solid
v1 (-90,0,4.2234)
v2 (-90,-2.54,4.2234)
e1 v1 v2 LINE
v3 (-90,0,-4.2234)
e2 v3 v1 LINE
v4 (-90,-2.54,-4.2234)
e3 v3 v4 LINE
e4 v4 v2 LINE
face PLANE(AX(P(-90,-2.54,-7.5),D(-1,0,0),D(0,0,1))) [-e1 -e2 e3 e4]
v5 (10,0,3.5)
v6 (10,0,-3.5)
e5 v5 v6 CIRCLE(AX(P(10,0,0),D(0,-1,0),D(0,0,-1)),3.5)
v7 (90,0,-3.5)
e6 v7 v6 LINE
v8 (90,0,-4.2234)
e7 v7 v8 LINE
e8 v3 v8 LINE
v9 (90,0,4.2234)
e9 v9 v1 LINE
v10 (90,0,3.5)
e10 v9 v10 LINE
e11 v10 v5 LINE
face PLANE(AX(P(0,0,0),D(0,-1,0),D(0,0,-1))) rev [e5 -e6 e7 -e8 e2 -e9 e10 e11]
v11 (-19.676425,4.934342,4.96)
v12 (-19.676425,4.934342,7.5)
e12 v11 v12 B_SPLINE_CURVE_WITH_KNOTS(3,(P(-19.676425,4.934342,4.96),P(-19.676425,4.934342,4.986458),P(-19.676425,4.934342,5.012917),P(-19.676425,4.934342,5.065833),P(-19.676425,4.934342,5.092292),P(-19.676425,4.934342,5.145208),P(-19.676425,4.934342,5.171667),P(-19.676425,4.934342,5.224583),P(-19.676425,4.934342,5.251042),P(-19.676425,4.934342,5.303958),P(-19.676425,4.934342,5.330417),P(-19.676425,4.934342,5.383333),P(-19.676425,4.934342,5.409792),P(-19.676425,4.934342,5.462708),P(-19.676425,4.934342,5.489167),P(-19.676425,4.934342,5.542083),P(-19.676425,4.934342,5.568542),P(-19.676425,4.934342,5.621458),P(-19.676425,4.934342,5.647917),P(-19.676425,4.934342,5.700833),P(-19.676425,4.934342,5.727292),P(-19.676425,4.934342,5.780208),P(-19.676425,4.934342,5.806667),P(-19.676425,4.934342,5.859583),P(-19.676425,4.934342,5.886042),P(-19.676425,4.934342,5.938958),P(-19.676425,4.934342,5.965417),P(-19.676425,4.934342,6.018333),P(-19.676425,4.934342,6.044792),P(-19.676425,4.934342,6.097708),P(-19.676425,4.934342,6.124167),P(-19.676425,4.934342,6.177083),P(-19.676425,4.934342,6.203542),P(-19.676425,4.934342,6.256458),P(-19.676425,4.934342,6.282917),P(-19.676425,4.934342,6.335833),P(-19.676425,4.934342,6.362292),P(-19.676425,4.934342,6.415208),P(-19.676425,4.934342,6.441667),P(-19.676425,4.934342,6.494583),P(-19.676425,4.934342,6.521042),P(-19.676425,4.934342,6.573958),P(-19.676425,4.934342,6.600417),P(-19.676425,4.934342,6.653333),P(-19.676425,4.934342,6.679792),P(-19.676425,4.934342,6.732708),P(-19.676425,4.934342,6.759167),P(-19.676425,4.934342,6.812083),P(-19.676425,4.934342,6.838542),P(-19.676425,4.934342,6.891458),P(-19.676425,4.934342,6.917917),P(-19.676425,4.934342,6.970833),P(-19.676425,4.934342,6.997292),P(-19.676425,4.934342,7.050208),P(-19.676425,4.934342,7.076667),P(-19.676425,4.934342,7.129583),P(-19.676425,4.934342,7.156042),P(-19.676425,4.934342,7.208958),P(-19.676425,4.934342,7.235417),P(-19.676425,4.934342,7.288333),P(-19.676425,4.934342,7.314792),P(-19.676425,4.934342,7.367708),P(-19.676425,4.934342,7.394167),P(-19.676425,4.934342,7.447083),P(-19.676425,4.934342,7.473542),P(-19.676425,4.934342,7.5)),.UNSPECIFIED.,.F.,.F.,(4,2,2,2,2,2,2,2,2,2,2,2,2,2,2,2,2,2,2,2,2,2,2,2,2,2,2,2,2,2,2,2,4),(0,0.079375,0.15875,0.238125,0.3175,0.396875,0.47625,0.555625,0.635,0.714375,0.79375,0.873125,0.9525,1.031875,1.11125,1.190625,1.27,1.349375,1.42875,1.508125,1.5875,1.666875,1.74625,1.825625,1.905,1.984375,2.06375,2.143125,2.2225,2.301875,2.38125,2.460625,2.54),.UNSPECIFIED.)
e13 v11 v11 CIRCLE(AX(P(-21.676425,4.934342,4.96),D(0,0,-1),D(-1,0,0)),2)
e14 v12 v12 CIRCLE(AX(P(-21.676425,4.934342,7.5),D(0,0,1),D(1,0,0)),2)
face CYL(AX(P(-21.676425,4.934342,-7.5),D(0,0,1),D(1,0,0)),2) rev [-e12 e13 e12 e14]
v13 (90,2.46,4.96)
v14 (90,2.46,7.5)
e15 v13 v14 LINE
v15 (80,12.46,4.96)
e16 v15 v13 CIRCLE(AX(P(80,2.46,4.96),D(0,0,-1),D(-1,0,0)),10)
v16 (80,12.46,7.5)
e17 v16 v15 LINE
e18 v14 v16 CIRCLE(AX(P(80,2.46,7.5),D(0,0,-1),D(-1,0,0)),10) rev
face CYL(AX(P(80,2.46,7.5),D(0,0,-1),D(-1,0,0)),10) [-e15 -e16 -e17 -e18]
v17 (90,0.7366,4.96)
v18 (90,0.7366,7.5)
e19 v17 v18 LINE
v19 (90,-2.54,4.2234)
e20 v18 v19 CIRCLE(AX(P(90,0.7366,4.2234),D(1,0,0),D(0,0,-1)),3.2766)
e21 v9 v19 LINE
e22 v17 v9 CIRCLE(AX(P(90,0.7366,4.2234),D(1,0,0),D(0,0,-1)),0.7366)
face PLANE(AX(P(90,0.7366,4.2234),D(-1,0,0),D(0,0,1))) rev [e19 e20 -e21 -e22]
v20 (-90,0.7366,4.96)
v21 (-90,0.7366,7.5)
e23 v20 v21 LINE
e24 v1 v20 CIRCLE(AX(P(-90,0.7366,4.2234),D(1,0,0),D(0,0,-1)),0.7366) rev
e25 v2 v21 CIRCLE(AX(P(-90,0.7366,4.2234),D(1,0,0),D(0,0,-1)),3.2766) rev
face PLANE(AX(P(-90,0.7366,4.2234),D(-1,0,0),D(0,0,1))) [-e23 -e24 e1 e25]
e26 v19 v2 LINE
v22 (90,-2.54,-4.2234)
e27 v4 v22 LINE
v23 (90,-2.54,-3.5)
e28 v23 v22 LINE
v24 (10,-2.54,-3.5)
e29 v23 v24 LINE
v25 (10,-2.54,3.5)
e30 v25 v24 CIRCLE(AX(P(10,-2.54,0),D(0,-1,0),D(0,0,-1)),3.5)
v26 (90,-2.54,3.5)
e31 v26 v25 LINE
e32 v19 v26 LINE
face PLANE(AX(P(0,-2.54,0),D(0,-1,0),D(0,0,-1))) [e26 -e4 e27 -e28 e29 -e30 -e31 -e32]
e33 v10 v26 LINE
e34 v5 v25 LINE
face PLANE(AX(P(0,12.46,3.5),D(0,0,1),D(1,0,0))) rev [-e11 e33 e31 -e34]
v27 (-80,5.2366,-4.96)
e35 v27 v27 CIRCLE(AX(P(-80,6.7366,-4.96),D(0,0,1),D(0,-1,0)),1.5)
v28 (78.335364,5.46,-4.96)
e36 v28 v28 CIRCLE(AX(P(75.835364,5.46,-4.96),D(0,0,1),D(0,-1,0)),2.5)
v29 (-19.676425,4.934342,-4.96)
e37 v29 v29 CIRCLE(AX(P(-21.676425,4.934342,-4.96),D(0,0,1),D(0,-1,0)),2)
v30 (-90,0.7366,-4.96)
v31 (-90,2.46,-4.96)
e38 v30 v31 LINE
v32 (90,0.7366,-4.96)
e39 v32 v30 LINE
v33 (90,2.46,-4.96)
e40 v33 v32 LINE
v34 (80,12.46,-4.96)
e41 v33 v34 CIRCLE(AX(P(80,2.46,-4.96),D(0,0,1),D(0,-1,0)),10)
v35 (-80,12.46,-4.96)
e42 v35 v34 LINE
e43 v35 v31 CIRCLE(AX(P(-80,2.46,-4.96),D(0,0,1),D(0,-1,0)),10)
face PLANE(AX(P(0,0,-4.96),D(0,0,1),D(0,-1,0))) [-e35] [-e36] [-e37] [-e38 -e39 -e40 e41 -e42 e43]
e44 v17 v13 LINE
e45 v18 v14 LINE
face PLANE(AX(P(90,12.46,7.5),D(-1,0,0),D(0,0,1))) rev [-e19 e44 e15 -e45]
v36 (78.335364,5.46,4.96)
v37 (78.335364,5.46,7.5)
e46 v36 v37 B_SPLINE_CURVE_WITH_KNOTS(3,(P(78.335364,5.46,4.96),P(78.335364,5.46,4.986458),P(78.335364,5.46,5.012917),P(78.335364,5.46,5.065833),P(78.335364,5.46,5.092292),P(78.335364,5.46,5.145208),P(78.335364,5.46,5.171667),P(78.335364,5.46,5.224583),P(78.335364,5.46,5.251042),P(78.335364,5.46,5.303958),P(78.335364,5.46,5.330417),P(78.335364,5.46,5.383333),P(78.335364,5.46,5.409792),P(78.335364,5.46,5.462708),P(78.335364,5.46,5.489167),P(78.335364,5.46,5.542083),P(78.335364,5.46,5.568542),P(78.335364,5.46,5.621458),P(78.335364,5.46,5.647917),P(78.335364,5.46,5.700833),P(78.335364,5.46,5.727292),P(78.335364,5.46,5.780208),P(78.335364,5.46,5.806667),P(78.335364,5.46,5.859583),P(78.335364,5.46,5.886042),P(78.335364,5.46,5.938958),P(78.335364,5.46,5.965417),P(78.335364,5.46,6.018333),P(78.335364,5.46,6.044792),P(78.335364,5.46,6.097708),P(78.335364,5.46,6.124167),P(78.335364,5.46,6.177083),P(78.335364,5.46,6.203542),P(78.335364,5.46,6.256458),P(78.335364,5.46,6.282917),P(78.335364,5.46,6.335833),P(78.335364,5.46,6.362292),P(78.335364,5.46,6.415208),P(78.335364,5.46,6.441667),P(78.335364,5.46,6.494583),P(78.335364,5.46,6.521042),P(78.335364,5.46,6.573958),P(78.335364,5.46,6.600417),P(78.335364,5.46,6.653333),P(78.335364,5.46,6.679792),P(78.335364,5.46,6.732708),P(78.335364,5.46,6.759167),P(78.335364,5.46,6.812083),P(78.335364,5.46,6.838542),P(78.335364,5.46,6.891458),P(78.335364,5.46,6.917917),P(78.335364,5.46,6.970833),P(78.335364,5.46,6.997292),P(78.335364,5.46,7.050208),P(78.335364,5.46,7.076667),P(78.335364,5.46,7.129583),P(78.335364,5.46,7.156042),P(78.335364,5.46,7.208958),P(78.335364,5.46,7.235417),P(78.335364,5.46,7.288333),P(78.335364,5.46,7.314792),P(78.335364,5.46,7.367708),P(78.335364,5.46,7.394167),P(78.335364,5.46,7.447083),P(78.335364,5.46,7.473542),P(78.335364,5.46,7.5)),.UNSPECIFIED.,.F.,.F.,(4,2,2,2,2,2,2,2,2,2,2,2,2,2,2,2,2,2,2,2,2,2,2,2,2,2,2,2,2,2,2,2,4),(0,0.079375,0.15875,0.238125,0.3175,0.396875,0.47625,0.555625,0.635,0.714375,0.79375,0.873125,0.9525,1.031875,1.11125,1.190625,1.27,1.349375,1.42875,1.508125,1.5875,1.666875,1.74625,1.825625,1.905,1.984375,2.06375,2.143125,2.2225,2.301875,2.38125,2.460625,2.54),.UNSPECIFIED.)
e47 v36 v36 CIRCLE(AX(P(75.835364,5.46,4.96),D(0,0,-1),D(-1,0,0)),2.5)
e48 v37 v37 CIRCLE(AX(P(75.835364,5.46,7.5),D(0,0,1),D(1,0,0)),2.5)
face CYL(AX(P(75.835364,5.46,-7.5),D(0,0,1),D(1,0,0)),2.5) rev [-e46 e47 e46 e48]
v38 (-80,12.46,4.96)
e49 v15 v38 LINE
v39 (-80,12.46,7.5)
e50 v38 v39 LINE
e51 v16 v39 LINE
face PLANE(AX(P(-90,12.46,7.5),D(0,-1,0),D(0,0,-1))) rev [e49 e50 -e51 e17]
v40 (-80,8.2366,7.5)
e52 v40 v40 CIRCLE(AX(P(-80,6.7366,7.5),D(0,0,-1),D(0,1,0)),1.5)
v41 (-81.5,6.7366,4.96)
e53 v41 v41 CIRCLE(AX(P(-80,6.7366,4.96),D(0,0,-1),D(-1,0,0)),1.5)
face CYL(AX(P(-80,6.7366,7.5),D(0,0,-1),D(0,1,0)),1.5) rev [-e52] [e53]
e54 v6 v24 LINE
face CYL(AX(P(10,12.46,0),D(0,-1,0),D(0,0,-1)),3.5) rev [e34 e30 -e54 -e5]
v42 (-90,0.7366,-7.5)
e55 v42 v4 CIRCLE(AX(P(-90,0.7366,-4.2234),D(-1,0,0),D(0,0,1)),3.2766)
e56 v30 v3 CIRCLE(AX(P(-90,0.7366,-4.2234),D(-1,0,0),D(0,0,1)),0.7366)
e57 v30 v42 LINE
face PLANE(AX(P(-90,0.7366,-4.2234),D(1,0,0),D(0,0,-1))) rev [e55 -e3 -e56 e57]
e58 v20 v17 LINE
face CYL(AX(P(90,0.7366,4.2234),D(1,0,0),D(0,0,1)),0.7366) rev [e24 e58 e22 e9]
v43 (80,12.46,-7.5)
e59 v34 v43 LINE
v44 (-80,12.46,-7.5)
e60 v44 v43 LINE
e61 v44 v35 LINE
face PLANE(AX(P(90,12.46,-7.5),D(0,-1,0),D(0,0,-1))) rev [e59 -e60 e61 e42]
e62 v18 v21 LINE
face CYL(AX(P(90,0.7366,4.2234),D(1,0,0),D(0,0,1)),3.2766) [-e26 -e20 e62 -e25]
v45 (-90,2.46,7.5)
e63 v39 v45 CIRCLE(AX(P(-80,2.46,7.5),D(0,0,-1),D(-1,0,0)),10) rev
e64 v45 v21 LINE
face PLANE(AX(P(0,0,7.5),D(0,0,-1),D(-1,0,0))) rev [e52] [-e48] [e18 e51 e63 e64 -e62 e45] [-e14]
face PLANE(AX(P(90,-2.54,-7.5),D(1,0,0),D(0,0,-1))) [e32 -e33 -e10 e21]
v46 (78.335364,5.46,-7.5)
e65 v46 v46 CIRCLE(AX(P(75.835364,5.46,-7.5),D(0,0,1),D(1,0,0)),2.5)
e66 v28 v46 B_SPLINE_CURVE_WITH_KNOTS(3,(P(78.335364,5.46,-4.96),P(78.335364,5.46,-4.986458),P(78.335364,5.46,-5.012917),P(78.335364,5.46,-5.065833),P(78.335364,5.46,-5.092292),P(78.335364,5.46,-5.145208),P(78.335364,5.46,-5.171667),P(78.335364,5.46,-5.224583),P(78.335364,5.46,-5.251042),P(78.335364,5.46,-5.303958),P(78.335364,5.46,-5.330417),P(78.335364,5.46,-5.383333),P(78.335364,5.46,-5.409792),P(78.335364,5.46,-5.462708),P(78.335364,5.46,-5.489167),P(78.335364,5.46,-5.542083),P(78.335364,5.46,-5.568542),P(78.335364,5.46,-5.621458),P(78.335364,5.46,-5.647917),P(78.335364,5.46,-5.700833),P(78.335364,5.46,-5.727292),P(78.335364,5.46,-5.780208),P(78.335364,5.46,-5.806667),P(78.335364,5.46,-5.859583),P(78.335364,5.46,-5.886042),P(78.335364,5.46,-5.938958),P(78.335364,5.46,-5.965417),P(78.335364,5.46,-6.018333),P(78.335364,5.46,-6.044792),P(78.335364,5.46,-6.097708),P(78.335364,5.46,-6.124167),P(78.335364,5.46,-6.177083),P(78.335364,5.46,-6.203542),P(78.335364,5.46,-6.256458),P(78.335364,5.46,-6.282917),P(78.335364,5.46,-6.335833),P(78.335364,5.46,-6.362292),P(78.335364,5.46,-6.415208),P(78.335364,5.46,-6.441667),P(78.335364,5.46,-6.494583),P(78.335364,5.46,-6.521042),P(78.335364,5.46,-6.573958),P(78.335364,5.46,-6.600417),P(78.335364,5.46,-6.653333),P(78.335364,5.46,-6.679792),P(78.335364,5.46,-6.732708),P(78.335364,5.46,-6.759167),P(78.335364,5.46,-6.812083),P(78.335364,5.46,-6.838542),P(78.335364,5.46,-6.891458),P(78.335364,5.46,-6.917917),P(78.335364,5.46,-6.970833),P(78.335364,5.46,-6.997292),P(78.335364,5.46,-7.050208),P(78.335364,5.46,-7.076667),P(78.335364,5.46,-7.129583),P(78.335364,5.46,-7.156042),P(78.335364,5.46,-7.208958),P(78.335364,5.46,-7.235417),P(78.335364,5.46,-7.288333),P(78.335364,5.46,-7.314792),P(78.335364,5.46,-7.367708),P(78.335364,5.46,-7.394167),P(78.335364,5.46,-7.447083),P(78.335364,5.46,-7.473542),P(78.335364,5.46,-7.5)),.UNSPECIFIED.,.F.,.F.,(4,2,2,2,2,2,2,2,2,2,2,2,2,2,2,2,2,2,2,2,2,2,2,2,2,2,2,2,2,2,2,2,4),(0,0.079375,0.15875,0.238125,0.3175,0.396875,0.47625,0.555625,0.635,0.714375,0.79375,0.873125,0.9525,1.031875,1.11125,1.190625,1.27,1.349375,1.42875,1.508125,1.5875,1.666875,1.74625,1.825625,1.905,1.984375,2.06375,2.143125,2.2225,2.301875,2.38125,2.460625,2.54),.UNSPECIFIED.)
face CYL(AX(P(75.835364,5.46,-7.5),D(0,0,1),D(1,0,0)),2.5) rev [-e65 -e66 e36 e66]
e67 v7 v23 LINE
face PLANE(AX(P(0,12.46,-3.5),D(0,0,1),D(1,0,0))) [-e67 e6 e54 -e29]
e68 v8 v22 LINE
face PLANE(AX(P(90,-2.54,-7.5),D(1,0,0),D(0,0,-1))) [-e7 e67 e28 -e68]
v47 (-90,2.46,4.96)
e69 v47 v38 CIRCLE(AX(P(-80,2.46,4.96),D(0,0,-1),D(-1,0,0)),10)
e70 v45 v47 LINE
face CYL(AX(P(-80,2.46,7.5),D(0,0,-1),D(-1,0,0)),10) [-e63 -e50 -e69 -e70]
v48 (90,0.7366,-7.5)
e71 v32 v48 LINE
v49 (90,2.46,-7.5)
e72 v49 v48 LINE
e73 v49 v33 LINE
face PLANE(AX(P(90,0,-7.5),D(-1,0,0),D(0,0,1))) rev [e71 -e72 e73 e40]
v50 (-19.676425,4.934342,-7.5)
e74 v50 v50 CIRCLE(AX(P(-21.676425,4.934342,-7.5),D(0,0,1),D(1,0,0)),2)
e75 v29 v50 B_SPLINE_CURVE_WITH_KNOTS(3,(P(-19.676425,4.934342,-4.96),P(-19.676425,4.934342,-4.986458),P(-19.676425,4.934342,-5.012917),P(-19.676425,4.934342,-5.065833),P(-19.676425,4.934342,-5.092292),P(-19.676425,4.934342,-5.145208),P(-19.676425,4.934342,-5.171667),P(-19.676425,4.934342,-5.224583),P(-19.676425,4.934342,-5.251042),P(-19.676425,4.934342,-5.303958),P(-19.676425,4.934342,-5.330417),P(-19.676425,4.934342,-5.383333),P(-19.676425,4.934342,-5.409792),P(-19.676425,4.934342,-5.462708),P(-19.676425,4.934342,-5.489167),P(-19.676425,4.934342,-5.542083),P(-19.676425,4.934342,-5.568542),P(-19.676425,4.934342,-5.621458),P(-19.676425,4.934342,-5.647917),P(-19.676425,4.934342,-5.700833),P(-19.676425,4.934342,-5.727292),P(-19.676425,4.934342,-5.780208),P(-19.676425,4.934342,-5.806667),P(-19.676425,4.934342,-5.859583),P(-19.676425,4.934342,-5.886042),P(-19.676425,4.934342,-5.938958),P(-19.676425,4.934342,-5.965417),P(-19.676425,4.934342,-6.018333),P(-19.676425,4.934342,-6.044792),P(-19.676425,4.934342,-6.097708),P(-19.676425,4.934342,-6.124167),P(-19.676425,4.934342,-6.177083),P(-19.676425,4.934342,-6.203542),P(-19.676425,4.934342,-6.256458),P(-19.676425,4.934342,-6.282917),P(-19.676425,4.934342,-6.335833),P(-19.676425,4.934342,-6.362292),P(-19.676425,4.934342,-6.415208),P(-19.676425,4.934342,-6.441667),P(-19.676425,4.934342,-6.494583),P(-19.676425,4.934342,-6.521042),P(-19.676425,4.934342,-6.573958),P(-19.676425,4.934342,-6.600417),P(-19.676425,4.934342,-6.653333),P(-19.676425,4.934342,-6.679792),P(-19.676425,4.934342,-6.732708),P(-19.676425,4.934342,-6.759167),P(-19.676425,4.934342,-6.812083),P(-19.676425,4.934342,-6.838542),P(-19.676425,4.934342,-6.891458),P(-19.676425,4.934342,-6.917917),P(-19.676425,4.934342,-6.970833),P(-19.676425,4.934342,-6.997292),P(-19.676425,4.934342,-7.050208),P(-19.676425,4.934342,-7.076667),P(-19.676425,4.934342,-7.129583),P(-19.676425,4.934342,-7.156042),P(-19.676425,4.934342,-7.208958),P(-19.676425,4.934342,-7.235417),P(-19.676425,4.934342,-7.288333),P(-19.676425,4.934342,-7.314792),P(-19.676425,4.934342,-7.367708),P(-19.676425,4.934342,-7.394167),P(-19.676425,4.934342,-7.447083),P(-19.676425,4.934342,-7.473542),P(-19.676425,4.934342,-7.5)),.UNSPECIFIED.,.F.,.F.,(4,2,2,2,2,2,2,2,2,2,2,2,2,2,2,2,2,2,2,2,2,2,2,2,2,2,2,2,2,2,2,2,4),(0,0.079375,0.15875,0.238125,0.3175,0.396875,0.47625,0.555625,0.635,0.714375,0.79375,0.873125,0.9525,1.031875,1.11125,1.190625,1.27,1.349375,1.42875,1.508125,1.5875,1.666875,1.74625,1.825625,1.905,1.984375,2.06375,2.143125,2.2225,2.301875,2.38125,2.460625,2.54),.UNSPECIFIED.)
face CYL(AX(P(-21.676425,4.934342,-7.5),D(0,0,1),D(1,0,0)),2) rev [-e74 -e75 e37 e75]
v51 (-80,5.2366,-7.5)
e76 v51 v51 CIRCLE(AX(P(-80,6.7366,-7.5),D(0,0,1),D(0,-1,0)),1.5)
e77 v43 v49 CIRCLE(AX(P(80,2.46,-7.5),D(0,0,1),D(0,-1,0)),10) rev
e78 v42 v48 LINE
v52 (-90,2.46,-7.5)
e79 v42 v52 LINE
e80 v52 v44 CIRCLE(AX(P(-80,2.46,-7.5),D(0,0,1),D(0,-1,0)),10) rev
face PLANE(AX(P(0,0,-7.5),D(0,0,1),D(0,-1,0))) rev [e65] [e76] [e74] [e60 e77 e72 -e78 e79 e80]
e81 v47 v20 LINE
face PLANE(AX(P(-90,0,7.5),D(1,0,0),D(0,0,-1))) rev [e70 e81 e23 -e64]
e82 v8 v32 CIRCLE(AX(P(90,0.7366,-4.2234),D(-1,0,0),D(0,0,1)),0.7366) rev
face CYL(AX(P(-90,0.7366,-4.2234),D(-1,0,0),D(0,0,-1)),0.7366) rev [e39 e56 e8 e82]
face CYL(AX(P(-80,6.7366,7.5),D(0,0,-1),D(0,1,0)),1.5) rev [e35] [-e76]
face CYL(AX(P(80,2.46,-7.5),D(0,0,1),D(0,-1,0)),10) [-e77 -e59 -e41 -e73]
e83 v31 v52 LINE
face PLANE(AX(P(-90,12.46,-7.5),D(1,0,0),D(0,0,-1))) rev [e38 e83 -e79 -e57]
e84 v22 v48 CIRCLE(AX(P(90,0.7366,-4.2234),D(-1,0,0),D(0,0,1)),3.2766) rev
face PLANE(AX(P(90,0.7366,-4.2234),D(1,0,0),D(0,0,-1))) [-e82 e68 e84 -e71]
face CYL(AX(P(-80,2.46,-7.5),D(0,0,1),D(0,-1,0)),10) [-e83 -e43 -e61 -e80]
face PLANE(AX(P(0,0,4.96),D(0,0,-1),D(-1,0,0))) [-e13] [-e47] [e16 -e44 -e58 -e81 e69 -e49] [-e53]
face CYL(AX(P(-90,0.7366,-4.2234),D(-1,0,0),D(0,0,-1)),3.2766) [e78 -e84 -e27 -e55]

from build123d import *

# Parameters (mm, degrees)
SKETCH1_W                    = 180
SKETCH1_H                    = 15
BASE_FLANGE1_DEPTH           = 2.54
EDGE_FLANGE1_STRIP_W         = 11.6332
EDGE_FLANGE1_STRIP_H         = 2.54
EDGE_FLANGE1_STRIP_CUT_DEPTH = 180
EDGE_FLANGE1_DEPTH           = 180
EDGE_FLANGE2_STRIP_W         = 11.6332
EDGE_FLANGE2_STRIP_H         = 2.54
EDGE_FLANGE2_STRIP_CUT_DEPTH = 180
EDGE_FLANGE2_DEPTH           = 180
CUT_EXTRUDE3_DEPTH           = 92.167437169
CUT_EXTRUDE3_DEPTH_BACK      = 92.167437169
SKETCH12_R                   = 2.5
CUT_EXTRUDE4_DEPTH           = 92.167437169
CUT_EXTRUDE4_DEPTH_BACK      = 92.167437169
SKETCH16_R                   = 2
CUT_EXTRUDE6_DEPTH           = 92.549167118
FILLET1_R                    = 10
CUT_EXTRUDE7_DEPTH           = 93.088281556
CUT_EXTRUDE7_DEPTH_BACK      = 93.088281556
SKETCH18_R                   = 1.5


# Sheet-metal steps are written as plain solids
with BuildPart() as part:
    # Sketch1 → Base-Flange1 (new body)
    with BuildSketch(Plane(origin=(0, 0, 0), x_dir=(1, 0, 0), z_dir=(0, 1, 0))):
        Rectangle(SKETCH1_W, SKETCH1_H)
    extrude(amount=-BASE_FLANGE1_DEPTH)

    # Edge-Flange1 strip (across the edge) → Edge-Flange1 strip cut (cut)
    with BuildSketch(Plane(origin=(-90, 0, 7.5), x_dir=(0, 0, -1), z_dir=(1, 0, 0))):
        with Locations((-2.54, -1.27)):
            Rectangle(EDGE_FLANGE1_STRIP_W, EDGE_FLANGE1_STRIP_H)
    extrude(amount=EDGE_FLANGE1_STRIP_CUT_DEPTH, mode=Mode.SUBTRACT)

    # Edge-Flange1 section (across the edge) → Edge-Flange1 (add)
    with BuildSketch(Plane(origin=(-90, 0, 7.5), x_dir=(0, 0, -1), z_dir=(1, 0, 0))):
        with BuildLine():
            Line((0, 0.7366), (0, 12.46))
            Line((0, 12.46), (2.54, 12.46))
            Line((2.54, 12.46), (2.54, 0.7366))
            ThreePointArc((2.54, 0.7366), (2.755745145, 0.215745145), (3.2766, 0))
            Line((3.2766, 0), (3.2766, -2.54))
            ThreePointArc((3.2766, -2.54), (0.959693921, -1.580306079), (0, 0.7366))
        make_face()
    extrude(amount=EDGE_FLANGE1_DEPTH)

    # Edge-Flange2 strip (across the edge) → Edge-Flange2 strip cut (cut)
    with BuildSketch(Plane(origin=(90, 0, -7.5), x_dir=(0, 0, 1), z_dir=(-1, 0, 0))):
        with Locations((-2.54, -1.27)):
            Rectangle(EDGE_FLANGE2_STRIP_W, EDGE_FLANGE2_STRIP_H)
    extrude(amount=EDGE_FLANGE2_STRIP_CUT_DEPTH, mode=Mode.SUBTRACT)

    # Edge-Flange2 section (across the edge) → Edge-Flange2 (add)
    with BuildSketch(Plane(origin=(90, 0, -7.5), x_dir=(0, 0, 1), z_dir=(-1, 0, 0))):
        with BuildLine():
            Line((0, 0.7366), (0, 12.46))
            Line((0, 12.46), (2.54, 12.46))
            Line((2.54, 12.46), (2.54, 0.7366))
            ThreePointArc((2.54, 0.7366), (2.755745145, 0.215745145), (3.2766, 0))
            Line((3.2766, 0), (3.2766, -2.54))
            ThreePointArc((3.2766, -2.54), (0.959693921, -1.580306079), (0, 0.7366))
        make_face()
    extrude(amount=EDGE_FLANGE2_DEPTH)

    # Sketch12 → Cut-Extrude3 (cut, two sides: drawn at the far end of the back side and taken through both)
    with BuildSketch(Plane.XY.offset(-CUT_EXTRUDE3_DEPTH_BACK)):
        with Locations((75.835364308, 5.46)):
            Circle(SKETCH12_R)
    extrude(amount=CUT_EXTRUDE3_DEPTH + CUT_EXTRUDE3_DEPTH_BACK, mode=Mode.SUBTRACT)

    # Sketch16 → Cut-Extrude4 (cut, two sides: drawn at the far end of the back side and taken through both)
    with BuildSketch(Plane.XY.offset(-CUT_EXTRUDE4_DEPTH_BACK)):
        with Locations((-21.676425181, 4.934342186)):
            Circle(SKETCH16_R)
    extrude(amount=CUT_EXTRUDE4_DEPTH + CUT_EXTRUDE4_DEPTH_BACK, mode=Mode.SUBTRACT)

    # Sketch17 → Cut-Extrude6 (cut, through all)
    with BuildSketch(Plane.XZ.offset(2.54)):
        with BuildLine():
            Line((90, -3.5), (90, 3.5))
            Line((90, 3.5), (10, 3.5))
            ThreePointArc((10, 3.5), (12.474873734, 2.474873734), (13.5, 0))
            ThreePointArc((13.5, 0), (12.474873734, -2.474873734), (10, -3.5))
            Line((10, -3.5), (90, -3.5))
        make_face()
        with BuildLine():
            ThreePointArc((13.5, 0), (12.474873734, 2.474873734), (10, 3.5))
            Line((10, 3.5), (10, -3.5))
            ThreePointArc((10, -3.5), (12.474873734, -2.474873734), (13.5, 0))
        make_face()
        with BuildLine():
            Line((10, -3.5), (10, 3.5))
            ThreePointArc((10, 3.5), (6.5, 0), (10, -3.5))
        make_face()
    extrude(amount=-CUT_EXTRUDE6_DEPTH, mode=Mode.SUBTRACT)

    # Fillet1
    fillet1_edges = [part.edges().sort_by_distance(p)[0] for p in [
        (-90, 12.46, 6.23),
        (90, 12.46, 6.23),
        (90, 12.46, -6.23),
        (-90, 12.46, -6.23),
    ]]
    fillet(fillet1_edges, radius=FILLET1_R)

    # Sketch18 → Cut-Extrude7 (cut, two sides: drawn at the far end of the back side and taken through both)
    with BuildSketch(Plane(origin=(0, 0, -7.5), x_dir=(-1, 0, 0), z_dir=(0, 0, -1)).offset(-CUT_EXTRUDE7_DEPTH_BACK)):
        with Locations(Location((80, 6.7366, 0), (0, 0, 270))):
            Circle(SKETCH18_R)
    extrude(amount=CUT_EXTRUDE7_DEPTH + CUT_EXTRUDE7_DEPTH_BACK, mode=Mode.SUBTRACT)


solid = part.part
